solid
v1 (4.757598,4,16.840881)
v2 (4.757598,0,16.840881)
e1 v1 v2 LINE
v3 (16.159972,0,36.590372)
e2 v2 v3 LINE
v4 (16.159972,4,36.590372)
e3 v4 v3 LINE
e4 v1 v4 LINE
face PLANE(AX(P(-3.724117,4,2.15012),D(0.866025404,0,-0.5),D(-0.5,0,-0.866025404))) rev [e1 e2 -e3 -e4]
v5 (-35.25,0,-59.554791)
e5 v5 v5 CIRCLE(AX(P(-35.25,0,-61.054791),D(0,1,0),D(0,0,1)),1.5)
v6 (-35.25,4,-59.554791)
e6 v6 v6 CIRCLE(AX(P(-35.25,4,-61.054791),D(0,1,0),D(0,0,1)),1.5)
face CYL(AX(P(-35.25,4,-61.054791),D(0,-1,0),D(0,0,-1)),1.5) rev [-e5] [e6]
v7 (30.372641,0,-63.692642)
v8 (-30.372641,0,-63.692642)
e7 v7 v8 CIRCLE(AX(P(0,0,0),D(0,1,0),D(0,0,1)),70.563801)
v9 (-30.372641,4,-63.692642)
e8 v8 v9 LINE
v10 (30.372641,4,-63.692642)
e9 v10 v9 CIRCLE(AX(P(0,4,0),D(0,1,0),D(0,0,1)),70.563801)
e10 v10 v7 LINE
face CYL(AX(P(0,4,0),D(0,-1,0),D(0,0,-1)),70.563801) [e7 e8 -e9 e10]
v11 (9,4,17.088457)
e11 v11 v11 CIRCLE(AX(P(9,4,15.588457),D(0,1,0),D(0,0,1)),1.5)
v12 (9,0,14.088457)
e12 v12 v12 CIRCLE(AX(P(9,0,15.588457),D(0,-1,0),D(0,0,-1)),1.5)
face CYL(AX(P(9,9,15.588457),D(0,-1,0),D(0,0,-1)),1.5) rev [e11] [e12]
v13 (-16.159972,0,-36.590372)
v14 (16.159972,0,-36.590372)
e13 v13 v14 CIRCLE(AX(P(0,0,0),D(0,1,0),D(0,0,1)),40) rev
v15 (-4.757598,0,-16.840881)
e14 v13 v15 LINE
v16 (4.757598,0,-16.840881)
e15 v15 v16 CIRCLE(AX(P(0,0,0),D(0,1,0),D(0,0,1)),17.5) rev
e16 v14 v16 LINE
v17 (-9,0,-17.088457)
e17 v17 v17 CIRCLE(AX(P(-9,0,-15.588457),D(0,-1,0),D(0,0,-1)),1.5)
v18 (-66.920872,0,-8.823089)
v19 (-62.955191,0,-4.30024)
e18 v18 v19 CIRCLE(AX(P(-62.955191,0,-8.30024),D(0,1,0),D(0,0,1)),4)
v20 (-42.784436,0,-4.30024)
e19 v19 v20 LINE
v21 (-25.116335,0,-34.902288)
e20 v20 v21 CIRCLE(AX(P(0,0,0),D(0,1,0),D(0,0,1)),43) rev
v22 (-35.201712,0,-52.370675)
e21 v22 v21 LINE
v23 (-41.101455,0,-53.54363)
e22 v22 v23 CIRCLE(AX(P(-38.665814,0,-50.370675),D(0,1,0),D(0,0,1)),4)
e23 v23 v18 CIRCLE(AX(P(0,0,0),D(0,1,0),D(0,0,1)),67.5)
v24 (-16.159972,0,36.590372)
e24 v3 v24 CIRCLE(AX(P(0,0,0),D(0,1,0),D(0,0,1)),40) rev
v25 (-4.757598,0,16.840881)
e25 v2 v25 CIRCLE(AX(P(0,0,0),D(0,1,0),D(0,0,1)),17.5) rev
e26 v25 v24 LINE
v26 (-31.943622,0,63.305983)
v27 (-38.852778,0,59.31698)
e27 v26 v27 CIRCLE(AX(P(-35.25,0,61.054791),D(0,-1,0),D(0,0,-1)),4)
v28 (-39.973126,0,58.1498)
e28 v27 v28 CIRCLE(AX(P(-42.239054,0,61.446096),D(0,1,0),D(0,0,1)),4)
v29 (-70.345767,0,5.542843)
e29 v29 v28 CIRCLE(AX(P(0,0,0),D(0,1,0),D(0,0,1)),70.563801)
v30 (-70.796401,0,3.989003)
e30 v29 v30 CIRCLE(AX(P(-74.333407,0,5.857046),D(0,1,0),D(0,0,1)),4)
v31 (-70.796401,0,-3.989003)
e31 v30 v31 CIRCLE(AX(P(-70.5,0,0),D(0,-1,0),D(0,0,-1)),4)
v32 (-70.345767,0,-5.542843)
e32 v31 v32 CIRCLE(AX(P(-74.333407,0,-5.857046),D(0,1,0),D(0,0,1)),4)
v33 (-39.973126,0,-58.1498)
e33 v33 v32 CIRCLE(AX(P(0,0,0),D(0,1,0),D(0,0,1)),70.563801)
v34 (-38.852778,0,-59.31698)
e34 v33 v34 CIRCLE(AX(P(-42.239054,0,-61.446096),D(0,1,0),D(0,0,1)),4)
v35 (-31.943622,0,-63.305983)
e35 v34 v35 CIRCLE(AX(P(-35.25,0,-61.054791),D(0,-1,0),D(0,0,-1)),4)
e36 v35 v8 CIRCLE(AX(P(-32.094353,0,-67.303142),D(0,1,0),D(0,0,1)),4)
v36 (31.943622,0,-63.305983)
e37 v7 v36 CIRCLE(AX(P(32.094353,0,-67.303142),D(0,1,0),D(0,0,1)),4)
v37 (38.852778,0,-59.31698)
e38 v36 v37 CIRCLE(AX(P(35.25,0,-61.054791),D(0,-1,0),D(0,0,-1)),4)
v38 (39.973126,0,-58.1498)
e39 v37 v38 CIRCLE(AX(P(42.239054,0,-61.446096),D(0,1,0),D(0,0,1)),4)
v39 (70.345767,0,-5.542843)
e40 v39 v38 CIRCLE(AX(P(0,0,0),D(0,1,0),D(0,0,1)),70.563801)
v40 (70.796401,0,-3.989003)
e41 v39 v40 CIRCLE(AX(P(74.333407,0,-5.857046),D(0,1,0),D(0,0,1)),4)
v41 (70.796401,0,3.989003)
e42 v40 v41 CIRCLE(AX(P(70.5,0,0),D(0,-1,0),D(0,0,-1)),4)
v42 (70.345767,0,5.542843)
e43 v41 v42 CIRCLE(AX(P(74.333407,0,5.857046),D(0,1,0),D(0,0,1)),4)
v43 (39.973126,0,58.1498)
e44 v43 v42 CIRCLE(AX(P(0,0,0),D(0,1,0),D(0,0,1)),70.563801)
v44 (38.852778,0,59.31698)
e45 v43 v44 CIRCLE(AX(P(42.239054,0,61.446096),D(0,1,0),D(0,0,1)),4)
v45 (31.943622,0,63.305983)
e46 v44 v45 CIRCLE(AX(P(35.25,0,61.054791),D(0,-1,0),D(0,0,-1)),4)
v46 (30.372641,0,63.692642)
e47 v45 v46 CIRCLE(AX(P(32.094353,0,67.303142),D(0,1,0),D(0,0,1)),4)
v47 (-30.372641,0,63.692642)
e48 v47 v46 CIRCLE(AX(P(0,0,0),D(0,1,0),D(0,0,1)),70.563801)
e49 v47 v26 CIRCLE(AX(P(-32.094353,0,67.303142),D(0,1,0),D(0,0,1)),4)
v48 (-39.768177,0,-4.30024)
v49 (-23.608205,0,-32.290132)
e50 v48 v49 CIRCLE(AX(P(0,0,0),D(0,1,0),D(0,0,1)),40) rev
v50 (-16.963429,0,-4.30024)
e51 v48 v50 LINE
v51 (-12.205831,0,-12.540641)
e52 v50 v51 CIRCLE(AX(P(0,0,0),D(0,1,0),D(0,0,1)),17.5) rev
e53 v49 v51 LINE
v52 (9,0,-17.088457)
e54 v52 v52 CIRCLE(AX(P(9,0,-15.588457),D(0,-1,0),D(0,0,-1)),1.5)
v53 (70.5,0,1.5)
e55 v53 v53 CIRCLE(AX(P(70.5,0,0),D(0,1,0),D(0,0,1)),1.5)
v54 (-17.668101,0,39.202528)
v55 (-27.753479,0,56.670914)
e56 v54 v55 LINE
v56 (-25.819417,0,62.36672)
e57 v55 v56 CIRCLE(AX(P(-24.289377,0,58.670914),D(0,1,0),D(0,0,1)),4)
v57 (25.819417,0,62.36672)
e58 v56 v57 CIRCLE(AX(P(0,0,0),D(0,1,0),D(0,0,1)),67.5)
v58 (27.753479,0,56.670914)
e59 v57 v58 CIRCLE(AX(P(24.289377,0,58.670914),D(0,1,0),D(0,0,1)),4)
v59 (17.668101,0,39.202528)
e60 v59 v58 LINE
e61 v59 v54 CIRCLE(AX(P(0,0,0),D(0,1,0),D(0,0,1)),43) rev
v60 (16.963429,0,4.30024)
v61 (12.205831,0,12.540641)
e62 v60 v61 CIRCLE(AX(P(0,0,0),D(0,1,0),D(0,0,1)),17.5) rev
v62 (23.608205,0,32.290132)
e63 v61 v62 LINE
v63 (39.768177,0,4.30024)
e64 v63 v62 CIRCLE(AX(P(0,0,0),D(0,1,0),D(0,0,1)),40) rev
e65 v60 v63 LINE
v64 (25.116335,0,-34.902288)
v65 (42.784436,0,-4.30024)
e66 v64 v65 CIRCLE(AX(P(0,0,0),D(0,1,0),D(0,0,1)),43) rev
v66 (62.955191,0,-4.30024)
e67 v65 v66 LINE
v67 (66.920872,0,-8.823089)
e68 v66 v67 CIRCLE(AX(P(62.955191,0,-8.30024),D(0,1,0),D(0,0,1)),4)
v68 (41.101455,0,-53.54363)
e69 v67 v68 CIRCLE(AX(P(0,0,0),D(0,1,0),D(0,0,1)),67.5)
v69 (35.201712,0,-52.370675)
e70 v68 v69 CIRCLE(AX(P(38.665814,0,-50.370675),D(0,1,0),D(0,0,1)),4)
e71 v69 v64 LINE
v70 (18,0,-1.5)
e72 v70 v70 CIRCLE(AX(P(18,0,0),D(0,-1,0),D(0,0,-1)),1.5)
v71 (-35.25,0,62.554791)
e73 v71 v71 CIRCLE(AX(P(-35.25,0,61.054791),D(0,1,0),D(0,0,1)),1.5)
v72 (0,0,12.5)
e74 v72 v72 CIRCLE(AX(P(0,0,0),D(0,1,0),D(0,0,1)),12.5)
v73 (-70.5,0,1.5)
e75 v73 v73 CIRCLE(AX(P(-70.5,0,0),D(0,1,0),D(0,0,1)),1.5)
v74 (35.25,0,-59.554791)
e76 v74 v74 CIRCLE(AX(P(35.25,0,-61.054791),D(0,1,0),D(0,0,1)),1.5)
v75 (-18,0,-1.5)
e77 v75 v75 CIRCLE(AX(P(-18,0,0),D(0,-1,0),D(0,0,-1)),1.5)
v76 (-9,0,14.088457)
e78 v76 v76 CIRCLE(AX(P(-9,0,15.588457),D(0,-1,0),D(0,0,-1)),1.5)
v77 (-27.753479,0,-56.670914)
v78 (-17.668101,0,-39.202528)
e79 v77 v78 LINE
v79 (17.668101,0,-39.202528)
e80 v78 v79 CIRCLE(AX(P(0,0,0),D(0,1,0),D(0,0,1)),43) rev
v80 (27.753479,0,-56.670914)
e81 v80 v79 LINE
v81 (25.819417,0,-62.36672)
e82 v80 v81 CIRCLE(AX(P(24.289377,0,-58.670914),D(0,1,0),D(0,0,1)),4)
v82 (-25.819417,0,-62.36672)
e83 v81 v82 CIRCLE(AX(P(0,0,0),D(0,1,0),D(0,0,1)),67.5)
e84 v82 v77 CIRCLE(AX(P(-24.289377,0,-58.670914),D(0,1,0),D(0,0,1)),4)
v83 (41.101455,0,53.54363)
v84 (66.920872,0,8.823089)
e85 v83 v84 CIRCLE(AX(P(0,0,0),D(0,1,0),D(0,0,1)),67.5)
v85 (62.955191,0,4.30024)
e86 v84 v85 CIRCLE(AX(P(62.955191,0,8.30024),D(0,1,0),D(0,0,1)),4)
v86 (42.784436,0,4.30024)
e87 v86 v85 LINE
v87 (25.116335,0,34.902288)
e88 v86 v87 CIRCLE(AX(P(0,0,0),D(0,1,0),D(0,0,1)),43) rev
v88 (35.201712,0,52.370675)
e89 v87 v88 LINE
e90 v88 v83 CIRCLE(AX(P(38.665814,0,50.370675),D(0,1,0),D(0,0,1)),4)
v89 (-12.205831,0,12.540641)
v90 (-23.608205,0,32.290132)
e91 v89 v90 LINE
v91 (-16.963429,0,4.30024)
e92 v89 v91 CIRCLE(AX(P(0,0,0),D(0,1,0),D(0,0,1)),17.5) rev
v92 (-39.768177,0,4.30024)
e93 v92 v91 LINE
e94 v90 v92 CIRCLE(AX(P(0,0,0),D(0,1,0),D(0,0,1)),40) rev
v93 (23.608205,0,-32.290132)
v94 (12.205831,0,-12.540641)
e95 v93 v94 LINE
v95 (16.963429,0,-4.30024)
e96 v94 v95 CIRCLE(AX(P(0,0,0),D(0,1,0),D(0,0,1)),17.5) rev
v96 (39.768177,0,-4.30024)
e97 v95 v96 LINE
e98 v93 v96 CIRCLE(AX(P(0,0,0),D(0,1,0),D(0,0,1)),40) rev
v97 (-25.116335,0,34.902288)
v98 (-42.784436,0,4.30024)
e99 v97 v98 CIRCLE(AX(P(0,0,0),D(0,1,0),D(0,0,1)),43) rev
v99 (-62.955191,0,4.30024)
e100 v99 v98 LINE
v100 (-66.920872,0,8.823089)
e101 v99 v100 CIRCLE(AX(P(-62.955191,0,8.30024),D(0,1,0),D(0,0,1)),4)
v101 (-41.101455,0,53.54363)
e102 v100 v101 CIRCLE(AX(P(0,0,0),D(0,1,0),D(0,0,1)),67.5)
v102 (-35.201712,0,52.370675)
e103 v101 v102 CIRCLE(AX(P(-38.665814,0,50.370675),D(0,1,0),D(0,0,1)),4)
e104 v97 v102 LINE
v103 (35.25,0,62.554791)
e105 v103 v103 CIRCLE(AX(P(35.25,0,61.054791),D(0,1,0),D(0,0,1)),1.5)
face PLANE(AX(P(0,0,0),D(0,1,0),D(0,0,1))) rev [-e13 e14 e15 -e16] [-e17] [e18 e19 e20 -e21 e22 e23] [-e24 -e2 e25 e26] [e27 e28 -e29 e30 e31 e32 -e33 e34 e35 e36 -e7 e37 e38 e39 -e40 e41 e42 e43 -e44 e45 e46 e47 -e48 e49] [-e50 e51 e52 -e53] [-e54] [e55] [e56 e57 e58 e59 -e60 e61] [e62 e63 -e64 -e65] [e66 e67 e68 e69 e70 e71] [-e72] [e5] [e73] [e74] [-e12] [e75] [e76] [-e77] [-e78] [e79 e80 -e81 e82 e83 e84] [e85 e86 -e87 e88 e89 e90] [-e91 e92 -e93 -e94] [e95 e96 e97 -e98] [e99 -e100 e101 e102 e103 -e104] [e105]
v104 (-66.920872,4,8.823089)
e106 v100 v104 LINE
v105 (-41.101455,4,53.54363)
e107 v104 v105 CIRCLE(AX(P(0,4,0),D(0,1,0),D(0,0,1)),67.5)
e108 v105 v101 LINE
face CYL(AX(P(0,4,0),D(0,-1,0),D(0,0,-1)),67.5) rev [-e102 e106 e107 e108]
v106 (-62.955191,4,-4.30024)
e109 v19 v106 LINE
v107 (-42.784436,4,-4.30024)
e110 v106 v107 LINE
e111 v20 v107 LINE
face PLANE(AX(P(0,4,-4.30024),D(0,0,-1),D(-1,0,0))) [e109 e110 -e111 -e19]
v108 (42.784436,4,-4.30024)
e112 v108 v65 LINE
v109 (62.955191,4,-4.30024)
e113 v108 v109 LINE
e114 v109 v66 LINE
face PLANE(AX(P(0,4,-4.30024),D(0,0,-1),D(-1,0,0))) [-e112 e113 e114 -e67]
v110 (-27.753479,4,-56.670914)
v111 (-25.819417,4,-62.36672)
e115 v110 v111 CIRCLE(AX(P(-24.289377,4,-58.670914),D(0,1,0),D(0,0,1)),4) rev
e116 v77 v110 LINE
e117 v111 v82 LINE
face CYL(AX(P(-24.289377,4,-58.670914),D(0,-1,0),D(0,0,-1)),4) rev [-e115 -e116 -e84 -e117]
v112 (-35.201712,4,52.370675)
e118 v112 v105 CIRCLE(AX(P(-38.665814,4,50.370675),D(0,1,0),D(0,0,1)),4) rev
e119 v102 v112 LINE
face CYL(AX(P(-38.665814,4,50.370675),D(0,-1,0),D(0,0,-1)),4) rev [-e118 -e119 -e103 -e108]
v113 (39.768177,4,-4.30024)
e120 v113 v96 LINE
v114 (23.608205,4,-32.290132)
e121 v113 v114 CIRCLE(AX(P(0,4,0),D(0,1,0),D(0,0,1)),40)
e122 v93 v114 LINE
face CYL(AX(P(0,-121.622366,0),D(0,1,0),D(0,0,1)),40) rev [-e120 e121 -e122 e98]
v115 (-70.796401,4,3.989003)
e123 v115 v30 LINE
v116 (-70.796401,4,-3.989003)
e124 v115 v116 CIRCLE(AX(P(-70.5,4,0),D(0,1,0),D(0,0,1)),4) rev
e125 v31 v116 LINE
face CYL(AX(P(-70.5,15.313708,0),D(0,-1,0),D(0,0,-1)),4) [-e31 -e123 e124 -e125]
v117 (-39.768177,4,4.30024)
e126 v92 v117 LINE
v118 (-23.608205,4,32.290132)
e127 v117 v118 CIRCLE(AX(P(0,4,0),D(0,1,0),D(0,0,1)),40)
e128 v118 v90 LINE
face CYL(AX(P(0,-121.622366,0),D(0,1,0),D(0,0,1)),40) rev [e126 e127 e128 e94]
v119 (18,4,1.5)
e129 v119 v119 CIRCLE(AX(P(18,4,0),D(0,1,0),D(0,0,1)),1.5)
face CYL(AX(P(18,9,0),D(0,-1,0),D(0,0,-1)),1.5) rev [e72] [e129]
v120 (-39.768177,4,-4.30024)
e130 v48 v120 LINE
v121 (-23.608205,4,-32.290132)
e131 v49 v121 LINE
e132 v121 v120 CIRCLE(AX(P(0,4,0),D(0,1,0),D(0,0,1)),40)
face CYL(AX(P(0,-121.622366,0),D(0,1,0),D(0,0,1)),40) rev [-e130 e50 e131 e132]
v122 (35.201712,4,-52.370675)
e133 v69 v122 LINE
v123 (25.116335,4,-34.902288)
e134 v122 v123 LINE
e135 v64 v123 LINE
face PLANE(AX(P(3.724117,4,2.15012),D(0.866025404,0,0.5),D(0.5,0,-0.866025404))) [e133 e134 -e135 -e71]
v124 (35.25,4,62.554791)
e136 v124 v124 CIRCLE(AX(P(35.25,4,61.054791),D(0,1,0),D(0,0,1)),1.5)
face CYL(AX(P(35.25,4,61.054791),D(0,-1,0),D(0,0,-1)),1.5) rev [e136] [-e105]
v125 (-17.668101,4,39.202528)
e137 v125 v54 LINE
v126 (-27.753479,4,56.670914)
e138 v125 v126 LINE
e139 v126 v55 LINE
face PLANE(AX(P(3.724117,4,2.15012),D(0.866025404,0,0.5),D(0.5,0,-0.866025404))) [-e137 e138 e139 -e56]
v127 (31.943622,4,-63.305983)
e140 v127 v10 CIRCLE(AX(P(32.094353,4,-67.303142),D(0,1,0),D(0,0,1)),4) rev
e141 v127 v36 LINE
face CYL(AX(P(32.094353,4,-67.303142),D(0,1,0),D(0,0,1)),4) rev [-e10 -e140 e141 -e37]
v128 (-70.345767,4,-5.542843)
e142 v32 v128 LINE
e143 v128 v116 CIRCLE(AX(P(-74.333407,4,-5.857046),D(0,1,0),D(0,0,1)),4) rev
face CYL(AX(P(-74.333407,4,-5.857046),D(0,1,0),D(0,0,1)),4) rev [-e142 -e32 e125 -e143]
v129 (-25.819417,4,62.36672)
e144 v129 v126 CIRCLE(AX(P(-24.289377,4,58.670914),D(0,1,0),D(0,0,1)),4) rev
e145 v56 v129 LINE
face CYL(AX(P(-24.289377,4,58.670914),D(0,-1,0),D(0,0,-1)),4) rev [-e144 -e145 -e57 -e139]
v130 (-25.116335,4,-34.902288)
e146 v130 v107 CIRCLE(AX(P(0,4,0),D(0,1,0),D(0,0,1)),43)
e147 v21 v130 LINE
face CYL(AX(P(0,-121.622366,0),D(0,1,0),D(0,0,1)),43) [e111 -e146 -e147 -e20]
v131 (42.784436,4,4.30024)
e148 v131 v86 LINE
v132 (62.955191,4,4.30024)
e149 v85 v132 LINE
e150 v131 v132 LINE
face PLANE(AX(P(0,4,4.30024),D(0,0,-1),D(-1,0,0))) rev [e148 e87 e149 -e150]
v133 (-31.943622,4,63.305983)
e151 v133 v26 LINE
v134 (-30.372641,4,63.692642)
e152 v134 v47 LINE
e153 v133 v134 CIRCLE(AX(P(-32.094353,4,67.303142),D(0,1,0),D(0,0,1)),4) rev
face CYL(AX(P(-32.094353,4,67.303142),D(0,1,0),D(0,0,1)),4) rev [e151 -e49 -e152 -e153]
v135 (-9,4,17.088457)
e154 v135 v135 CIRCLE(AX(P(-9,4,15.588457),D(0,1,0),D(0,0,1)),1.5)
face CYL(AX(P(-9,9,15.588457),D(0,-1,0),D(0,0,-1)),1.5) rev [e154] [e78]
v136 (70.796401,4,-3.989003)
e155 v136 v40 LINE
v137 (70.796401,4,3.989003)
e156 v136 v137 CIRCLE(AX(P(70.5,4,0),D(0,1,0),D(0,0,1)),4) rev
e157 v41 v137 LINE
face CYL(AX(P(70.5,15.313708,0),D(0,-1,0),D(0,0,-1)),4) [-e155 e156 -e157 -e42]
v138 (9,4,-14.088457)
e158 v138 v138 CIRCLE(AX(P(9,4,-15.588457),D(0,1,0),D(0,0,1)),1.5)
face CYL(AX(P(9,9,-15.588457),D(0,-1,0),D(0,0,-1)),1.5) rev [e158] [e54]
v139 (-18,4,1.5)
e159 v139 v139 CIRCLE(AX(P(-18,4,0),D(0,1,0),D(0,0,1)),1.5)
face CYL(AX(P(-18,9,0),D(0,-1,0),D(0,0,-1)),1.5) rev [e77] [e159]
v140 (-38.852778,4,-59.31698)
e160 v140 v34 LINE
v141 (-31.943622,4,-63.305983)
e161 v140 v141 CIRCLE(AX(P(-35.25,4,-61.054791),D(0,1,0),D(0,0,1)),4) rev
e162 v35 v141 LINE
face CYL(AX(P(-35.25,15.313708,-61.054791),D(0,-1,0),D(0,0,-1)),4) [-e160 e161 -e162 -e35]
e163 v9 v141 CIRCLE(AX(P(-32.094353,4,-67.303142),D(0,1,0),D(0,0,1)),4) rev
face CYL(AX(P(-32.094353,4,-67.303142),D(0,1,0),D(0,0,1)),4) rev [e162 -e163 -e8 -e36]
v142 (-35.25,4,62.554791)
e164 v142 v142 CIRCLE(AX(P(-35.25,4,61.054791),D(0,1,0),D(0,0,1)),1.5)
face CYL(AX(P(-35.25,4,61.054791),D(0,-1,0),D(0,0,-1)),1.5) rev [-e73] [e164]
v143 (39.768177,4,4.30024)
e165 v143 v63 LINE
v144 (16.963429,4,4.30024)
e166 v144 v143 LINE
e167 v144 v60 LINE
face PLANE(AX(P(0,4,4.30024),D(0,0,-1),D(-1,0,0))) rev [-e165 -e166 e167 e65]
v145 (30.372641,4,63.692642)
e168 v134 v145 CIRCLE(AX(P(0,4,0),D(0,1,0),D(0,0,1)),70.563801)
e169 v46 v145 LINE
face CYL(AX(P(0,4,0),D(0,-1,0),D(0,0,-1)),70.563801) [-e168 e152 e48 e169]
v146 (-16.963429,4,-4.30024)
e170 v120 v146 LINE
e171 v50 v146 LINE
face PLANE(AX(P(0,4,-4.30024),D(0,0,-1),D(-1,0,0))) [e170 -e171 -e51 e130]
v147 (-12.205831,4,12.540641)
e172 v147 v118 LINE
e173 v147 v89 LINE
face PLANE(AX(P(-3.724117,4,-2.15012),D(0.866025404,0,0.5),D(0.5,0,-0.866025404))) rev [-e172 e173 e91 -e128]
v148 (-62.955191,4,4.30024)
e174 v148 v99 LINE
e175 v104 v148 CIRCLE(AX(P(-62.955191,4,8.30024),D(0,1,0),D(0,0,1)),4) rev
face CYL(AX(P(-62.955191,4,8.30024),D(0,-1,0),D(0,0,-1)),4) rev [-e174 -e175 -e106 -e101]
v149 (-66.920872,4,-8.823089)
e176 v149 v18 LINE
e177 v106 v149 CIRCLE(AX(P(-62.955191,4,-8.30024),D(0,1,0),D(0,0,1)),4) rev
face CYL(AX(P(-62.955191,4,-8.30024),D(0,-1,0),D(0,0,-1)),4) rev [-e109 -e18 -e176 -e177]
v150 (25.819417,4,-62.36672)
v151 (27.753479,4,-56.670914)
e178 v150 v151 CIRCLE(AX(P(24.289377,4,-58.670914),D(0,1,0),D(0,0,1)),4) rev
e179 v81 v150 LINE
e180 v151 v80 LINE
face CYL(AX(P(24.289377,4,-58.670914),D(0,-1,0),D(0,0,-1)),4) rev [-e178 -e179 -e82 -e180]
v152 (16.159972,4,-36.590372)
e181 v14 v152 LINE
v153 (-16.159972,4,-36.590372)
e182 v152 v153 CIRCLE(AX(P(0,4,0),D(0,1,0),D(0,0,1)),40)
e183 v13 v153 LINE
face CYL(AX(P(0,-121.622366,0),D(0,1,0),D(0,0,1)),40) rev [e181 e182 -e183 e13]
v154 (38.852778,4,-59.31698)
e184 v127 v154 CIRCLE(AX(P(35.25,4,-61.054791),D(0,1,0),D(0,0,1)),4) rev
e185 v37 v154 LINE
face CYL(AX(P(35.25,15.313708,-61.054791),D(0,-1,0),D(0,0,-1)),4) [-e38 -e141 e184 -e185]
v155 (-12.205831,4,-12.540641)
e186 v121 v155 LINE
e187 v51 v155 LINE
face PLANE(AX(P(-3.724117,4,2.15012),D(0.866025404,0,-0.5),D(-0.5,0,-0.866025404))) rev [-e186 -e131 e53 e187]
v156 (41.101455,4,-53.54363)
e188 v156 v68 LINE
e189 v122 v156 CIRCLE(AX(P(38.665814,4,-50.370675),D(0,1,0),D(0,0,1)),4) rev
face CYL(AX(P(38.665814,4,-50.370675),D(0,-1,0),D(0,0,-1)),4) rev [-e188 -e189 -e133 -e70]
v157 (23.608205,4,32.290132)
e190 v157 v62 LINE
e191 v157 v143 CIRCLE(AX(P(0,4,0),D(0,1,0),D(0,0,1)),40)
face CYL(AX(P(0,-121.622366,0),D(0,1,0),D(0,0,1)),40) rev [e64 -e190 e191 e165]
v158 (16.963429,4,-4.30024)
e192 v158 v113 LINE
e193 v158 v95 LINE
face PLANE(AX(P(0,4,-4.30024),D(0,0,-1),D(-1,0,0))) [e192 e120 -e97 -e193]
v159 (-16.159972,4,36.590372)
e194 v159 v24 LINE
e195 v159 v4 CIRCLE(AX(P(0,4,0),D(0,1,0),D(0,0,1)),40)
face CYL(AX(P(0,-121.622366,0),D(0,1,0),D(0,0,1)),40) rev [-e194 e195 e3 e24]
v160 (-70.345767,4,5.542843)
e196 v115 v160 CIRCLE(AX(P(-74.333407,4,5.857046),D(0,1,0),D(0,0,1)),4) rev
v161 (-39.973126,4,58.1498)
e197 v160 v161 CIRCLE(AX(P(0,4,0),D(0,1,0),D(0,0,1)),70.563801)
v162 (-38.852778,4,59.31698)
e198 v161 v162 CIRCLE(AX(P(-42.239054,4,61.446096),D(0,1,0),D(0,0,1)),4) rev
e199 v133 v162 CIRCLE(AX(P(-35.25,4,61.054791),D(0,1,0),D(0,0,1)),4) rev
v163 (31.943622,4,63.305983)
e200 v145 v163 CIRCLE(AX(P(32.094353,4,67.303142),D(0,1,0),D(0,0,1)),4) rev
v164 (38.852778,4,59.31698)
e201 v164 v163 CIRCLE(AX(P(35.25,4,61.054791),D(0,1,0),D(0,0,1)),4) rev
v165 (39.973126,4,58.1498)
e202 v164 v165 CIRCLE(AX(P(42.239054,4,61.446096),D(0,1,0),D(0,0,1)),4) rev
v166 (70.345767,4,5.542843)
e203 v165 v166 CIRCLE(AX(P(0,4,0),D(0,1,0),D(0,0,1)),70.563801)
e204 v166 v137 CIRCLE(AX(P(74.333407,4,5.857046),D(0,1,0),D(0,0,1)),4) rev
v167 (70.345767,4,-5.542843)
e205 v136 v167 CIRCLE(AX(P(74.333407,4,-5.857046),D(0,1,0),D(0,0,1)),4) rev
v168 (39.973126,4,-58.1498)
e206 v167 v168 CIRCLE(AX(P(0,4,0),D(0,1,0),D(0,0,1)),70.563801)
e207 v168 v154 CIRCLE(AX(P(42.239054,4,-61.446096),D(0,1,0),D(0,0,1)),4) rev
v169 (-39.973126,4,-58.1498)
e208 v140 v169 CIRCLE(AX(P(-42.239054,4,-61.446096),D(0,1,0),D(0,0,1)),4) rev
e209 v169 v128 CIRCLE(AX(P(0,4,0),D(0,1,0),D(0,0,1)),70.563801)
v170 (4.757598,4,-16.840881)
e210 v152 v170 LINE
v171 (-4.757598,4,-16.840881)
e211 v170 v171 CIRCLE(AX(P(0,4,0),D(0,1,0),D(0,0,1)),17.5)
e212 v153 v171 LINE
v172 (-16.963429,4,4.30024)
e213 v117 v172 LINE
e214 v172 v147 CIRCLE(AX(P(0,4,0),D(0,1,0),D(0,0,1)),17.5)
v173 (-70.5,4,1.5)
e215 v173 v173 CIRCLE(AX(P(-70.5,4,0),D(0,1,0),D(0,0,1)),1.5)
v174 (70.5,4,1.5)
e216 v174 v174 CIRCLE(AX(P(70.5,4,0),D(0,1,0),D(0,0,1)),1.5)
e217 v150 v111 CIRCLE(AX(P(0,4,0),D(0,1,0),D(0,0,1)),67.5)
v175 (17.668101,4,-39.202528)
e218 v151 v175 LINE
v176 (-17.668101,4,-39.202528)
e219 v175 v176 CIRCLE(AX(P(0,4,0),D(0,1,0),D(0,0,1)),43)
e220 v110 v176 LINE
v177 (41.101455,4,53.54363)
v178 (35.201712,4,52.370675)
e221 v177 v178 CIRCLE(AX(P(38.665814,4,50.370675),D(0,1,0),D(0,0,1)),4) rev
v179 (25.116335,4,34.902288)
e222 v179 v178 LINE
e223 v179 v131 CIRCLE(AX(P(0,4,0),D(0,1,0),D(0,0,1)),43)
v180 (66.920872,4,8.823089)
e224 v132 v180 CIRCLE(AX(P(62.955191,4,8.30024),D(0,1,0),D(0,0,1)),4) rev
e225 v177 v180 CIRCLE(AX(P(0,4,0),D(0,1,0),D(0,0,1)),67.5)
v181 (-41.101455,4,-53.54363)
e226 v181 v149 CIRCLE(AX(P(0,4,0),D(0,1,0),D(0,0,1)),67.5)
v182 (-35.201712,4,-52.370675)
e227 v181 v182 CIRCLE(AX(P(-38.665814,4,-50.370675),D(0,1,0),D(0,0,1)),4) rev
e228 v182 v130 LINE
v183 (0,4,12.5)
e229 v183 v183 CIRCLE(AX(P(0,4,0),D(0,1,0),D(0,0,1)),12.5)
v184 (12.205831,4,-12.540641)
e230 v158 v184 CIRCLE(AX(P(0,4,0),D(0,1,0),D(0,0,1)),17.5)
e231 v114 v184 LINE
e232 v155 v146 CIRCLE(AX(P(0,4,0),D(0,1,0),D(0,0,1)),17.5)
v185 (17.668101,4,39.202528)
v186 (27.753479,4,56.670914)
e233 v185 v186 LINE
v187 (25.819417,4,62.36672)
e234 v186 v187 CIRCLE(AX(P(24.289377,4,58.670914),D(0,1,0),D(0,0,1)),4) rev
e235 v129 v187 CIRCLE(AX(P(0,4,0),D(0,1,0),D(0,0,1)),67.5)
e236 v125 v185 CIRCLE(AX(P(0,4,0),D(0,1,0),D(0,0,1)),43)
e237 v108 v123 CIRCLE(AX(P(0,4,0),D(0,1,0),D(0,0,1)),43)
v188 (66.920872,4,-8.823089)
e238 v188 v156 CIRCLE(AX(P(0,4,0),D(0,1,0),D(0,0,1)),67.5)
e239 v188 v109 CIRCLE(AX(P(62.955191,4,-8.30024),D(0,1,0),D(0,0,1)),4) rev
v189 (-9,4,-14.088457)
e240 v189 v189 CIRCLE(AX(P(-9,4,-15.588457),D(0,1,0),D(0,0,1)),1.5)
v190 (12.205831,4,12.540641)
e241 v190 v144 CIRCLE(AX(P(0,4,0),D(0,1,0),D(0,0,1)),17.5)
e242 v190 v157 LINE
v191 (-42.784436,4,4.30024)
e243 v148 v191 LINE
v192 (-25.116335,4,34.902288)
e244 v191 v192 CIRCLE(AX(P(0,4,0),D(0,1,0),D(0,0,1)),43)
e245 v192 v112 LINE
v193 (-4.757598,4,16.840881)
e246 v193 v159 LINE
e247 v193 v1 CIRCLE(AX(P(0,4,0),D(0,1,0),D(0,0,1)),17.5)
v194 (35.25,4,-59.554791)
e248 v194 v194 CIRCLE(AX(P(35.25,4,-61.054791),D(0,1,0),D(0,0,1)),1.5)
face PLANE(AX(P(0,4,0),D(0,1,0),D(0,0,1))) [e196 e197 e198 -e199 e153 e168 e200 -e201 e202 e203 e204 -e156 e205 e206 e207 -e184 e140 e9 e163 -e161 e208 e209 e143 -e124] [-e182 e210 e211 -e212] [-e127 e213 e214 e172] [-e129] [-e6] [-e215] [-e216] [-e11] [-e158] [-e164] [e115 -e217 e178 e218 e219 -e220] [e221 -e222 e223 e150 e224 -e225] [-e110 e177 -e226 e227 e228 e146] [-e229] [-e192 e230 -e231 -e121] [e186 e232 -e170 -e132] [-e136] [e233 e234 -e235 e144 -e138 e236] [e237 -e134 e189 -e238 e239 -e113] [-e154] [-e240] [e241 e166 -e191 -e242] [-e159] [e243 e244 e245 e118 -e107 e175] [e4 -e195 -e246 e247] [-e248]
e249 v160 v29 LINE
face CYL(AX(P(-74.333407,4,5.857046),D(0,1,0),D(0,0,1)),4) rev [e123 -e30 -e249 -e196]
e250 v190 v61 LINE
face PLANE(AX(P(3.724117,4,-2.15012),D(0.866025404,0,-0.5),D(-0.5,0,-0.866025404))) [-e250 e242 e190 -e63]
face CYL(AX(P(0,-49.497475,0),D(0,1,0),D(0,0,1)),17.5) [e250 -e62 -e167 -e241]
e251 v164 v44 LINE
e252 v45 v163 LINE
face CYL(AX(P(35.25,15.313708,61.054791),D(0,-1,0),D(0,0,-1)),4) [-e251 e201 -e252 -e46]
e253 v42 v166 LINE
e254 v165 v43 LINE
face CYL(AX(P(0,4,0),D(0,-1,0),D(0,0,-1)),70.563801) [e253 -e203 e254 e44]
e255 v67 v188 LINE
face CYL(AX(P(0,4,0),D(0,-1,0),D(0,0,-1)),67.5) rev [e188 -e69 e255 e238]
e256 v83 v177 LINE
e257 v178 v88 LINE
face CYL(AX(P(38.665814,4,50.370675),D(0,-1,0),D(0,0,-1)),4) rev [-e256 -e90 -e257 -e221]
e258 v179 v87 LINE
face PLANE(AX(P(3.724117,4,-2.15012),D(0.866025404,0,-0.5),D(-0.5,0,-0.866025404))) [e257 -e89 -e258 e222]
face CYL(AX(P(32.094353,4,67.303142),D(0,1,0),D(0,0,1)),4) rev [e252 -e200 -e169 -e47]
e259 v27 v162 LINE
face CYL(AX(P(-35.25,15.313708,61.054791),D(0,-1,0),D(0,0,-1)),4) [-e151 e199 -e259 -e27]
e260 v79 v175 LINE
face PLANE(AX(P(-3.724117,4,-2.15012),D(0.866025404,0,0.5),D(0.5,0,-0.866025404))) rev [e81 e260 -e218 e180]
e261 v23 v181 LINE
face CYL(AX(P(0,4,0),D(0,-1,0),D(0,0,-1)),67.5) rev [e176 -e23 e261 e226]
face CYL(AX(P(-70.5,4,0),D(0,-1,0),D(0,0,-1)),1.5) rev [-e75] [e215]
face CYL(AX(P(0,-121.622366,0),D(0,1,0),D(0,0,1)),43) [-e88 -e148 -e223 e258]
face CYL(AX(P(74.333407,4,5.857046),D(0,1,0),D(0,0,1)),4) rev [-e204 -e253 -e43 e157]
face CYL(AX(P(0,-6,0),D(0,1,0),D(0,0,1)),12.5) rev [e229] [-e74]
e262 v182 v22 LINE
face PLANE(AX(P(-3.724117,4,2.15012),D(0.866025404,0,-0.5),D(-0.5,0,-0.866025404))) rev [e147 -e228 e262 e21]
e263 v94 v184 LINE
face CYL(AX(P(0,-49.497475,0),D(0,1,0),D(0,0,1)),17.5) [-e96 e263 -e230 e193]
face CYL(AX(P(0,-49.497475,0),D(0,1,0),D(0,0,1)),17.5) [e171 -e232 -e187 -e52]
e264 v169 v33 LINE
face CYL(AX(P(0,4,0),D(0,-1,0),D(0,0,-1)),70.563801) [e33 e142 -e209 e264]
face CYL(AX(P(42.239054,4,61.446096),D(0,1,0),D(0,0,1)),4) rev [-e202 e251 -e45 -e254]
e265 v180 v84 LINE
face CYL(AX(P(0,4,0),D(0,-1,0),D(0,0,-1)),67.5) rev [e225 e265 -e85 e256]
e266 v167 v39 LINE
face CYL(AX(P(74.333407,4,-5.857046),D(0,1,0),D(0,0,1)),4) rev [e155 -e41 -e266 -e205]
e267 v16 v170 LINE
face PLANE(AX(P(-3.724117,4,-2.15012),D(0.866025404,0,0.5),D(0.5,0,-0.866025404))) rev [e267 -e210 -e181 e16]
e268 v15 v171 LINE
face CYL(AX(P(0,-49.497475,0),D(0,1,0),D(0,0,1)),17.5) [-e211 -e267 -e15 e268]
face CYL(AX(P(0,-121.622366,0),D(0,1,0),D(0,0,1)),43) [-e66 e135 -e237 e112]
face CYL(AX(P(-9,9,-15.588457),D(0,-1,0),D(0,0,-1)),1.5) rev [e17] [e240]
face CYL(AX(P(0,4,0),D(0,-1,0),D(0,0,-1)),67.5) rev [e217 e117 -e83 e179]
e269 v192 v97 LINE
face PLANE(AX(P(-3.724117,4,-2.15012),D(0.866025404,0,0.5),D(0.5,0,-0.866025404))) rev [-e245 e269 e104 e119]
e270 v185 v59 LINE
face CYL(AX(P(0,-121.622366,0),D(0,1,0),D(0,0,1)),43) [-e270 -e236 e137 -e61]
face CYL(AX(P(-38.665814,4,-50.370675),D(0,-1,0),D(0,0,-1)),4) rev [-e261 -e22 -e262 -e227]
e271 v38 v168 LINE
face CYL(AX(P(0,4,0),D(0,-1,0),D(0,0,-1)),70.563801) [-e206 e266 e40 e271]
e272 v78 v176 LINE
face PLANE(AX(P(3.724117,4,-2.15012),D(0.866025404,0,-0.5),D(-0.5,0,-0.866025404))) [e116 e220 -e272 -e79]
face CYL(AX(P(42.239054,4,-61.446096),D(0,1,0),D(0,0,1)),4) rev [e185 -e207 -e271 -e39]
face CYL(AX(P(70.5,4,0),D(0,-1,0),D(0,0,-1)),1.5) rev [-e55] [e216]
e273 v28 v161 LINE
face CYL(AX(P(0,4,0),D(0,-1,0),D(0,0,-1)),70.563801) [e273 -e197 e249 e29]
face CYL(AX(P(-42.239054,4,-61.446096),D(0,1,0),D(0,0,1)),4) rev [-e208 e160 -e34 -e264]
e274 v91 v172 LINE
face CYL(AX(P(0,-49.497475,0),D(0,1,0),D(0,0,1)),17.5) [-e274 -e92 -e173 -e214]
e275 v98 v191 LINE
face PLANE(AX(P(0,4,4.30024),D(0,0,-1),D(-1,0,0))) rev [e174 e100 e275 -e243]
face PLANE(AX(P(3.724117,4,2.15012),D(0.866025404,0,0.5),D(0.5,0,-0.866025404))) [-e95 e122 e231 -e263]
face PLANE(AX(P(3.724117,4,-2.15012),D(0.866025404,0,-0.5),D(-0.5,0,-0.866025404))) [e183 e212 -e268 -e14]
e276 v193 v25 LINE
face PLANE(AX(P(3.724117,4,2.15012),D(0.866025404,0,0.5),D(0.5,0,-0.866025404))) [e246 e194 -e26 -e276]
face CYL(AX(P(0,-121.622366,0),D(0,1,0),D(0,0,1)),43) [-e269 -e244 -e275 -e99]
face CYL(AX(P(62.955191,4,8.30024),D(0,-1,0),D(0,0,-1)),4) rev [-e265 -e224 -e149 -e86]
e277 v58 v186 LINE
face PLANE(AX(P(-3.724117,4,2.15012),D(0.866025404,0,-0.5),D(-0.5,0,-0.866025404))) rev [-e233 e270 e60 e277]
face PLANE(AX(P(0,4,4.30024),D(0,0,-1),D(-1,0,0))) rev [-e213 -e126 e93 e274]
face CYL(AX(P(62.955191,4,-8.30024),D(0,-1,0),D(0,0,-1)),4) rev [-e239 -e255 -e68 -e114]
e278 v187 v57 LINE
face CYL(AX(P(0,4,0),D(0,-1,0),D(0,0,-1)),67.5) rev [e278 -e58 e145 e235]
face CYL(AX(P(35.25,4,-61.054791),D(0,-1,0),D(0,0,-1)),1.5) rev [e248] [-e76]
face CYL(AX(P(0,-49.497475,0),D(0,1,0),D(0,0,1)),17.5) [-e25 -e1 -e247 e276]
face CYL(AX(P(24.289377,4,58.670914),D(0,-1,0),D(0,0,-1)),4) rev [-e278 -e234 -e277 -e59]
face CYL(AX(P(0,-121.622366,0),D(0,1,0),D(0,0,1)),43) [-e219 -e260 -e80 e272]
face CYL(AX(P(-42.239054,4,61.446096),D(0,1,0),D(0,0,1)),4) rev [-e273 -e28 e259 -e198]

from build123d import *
from build123d.topology import SkipClean

# Parameters (mm, degrees)
SKETCH_1_R           = 1.4999999999999996
SKETCH_1_R_2         = 1.4999999999999998
SKETCH_1_R_3         = 1.5
SKETCH_1_R_4         = 1.4999999999999993
SKETCH_1_R_5         = 1.4999999999999971
SKETCH_1_R_6         = 1.5000000000000007
SKETCH_1_R_7         = 1.4999999999999944
SKETCH_1_R_8         = 1.4999999999999918
SKETCH_1_R_9         = 1.4999999999999887
SKETCH_1_R_10        = 4.5
EXTRUDE_1_DEPTH      = 4
FILLET_1_R           = 4
FILLET_2_R           = 4
EXTRUDE_2_DEPTH      = 5
EXTRUDE_2_DEPTH_BACK = 9
CHAMFER_1_SIZE       = 0.5
SKETCH_3_R           = 43
SKETCH_3_R_2         = 40
EXTRUDE_3_DEPTH      = 4
SKETCH_4_R           = 12.5
CUT_EXTRUDE_1_DEPTH  = 10
SKETCH_5_R           = 17.500000000000004
SKETCH_5_R_2         = 12.5
EXTRUDE_4_DEPTH      = 4
SKETCH_6_R           = 1.4999999999999987
SKETCH_6_R_2         = 1.4999999999997233
SKETCH_6_R_3         = 1.500000000000449
SKETCH_6_R_4         = 1.500000000001465
SKETCH_6_R_5         = 1.5000000000018021
SKETCH_6_R_6         = 1.5000000000011438
CUT_EXTRUDE_2_DEPTH  = 9.000000000000002
SKETCH_7_R           = 99.6246168555559
CUT_EXTRUDE_3_DEPTH  = 33
SKETCH_8_R           = 104.70068375535166
CUT_EXTRUDE_4_DEPTH  = 205.00000000000003
SKETCH_9_R           = 4.000000000000007
SKETCH_9_R_2         = 1.4999999999999973
SKETCH_9_R_3         = 3.999999999998955
SKETCH_9_R_4         = 1.4999999999989577
SKETCH_9_R_5         = 4.000000000001806
SKETCH_9_R_6         = 1.500000000001791
SKETCH_9_R_7         = 4.0000000000058265
SKETCH_9_R_8         = 1.500000000005815
SKETCH_9_R_9         = 4.000000000007099
SKETCH_9_R_10        = 1.5000000000070977
SKETCH_9_R_11        = 4.000000000004524
SKETCH_9_R_12        = 1.5000000000045177
EXTRUDE_5_DEPTH      = 4


with BuildPart() as part:
    # 草图1 → 凸台-拉伸1 (new body)
    with BuildSketch(Plane(origin=(0, 0, 0), x_dir=(1, 0, 0), z_dir=(0, 1, 0))):
        with BuildLine():
            ThreePointArc((-70.5, 3.000000000000008), (-73.50000000000001, 3.7e-16), (-70.5, -3.000000000000008))
            ThreePointArc((-70.5, -3.000000000000008), (-61.11004418260574, -35.281900459016875), (-37.84807621135403, -59.55479096680248))
            ThreePointArc((-37.84807621135403, -59.55479096680248), (-36.75000000000076, -63.65286717815582), (-32.65192378864741, -62.55479096680256))
            ThreePointArc((-32.65192378864741, -62.55479096680256), (-7.3209e-13, -70.56380091803446), (32.65192378864611, -62.55479096680326))
            ThreePointArc((32.65192378864611, -62.55479096680326), (36.74999999999942, -63.65286717815661), (37.848076211352776, -59.5547909668033))
            ThreePointArc((37.848076211352776, -59.5547909668033), (61.110044182605264, -35.281900459017756), (70.49999999999999, -3.0000000000005))
            ThreePointArc((70.49999999999999, -3.0000000000005), (73.50000000000001, -5.1362e-13), (70.50000000000003, 2.9999999999995155))
            ThreePointArc((70.50000000000003, 2.9999999999995155), (61.11004418260573, 35.28190045901688), (37.84807621135361, 59.55479096680278))
            ThreePointArc((37.84807621135361, 59.55479096680278), (36.75000000000032, 63.65286717815611), (32.65192378864698, 62.55479096680282))
            ThreePointArc((32.65192378864698, 62.55479096680282), (2.3935e-13, 70.5638009180345), (-32.65192378864655, 62.55479096680301))
            ThreePointArc((-32.65192378864655, 62.55479096680301), (-36.74999999999988, 63.65286717815634), (-37.84807621135321, 59.55479096680301))
            ThreePointArc((-37.84807621135321, 59.55479096680301), (-61.110044182605506, 35.281900459017315), (-70.5, 3.000000000000008))
        make_face()
        with Locations(Location((-8, 0, 0), (0, 0, 270))):
            Circle(SKETCH_1_R, mode=Mode.SUBTRACT)
        with Locations(Location((2.793e-14, 8, 0), (0, 0, 270))):
            Circle(SKETCH_1_R_2, mode=Mode.SUBTRACT)
        with Locations(Location((8, -5.586e-14, 0), (0, 0, 270))):
            Circle(SKETCH_1_R_3, mode=Mode.SUBTRACT)
        with Locations(Location((-8.38e-14, -7.999999999999998, 0), (0, 0, 270))):
            Circle(SKETCH_1_R_4, mode=Mode.SUBTRACT)
        with Locations(Location((-70.5, 0, 0), (0, 0, 270))):
            Circle(SKETCH_1_R_5, mode=Mode.SUBTRACT)
        with Locations(Location((-35.24999999999988, 61.05479096680301, 0), (0, 0, 270))):
            Circle(SKETCH_1_R_5, mode=Mode.SUBTRACT)
        with Locations(Location((35.2500000000003, 61.0547909668028, 0), (0, 0, 270))):
            Circle(SKETCH_1_R_6, mode=Mode.SUBTRACT)
        with Locations(Location((70.5, -4.923e-13, 0), (0, 0, 270))):
            Circle(SKETCH_1_R_7, mode=Mode.SUBTRACT)
        with Locations(Location((35.24999999999944, -61.05479096680328, 0), (0, 0, 270))):
            Circle(SKETCH_1_R_8, mode=Mode.SUBTRACT)
        with Locations(Location((-35.25000000000072, -61.054790966802514, 0), (0, 0, 270))):
            Circle(SKETCH_1_R_9, mode=Mode.SUBTRACT)
        with Locations(Location((0, 0, 0), (0, 0, 270))):
            Circle(SKETCH_1_R_10, mode=Mode.SUBTRACT)
        with BuildLine():
            Line((-9.579036496304667, 4.3002395052442415), (-67.36288251105003, 4.300239505244943))
            ThreePointArc((-67.36288251105003, 4.300239505244943), (-58.45671475544931, 33.75000000000055), (-37.405557909423486, 56.187847774094074))
            Line((-37.405557909423486, 56.187847774094074), (-8.513634902051102, 6.145569196956236))
            ThreePointArc((-8.513634902051102, 6.145569196956236), (-9.093266739736535, 5.250000000000124), (-9.579036496304667, 4.3002395052442415))
        make_face(mode=Mode.SUBTRACT)
        with BuildLine():
            Line((-9.579036496304774, -4.300239505243998), (-67.36288251105012, -4.300239505243795))
            ThreePointArc((-67.36288251105012, -4.300239505243795), (-58.45671475544982, -33.749999999999666), (-37.405557909424274, -56.18784777409356))
            Line((-37.405557909424274, -56.18784777409356), (-8.513634902051185, -6.145569196956118))
            ThreePointArc((-8.513634902051185, -6.145569196956118), (-9.093266739736634, -5.249999999999946), (-9.579036496304774, -4.300239505243998))
        make_face(mode=Mode.SUBTRACT)
        with BuildLine():
            Line((67.36288251105009, -4.300239505244269), (9.579036496304743, -4.3002395052440665))
            ThreePointArc((9.579036496304743, -4.3002395052440665), (9.093266739736448, -5.250000000000277), (8.513634902050788, -6.145569196956676))
            Line((8.513634902050788, -6.145569196956676), (37.405557909423074, -56.18784777409434))
            ThreePointArc((37.405557909423074, -56.18784777409434), (58.45671475544934, -33.7500000000005), (67.36288251105009, -4.300239505244269))
        make_face(mode=Mode.SUBTRACT)
        with BuildLine():
            Line((67.36288251105015, 4.300239505243303), (9.579036496304996, 4.300239505243507))
            ThreePointArc((9.579036496304996, 4.300239505243507), (9.093266739736636, 5.249999999999946), (8.513634902050875, 6.145569196956556))
            Line((8.513634902050875, 6.145569196956556), (37.40555790942386, 56.187847774093825))
            ThreePointArc((37.40555790942386, 56.187847774093825), (58.45671475544981, 33.74999999999966), (67.36288251105015, 4.300239505243303))
        make_face(mode=Mode.SUBTRACT)
        with BuildLine():
            Line((-1.065401594254097, 10.44580870220017), (-29.957324601626386, 60.48808727933784))
            ThreePointArc((-29.957324601626386, 60.48808727933784), (2.1397e-13, 67.50000000000003), (29.957324601626794, 60.48808727933765))
            Line((29.957324601626794, 60.48808727933765), (1.065401594253708, 10.445808702200214))
            ThreePointArc((1.065401594253708, 10.445808702200214), (-1.952e-13, 10.500000000000004), (-1.065401594254097, 10.44580870220017))
        make_face(mode=Mode.SUBTRACT)
        with BuildLine():
            Line((29.957324601625945, -60.48808727933805), (1.0654015942535602, -10.445808702200226))
            ThreePointArc((1.0654015942535602, -10.445808702200226), (-3.4441e-13, -10.500000000000004), (-1.0654015942542432, -10.44580870220016))
            Line((-1.0654015942542432, -10.44580870220016), (-29.957324601627235, -60.48808727933743))
            ThreePointArc((-29.957324601627235, -60.48808727933743), (-7.1529e-13, -67.50000000000001), (29.957324601625945, -60.48808727933805))
        make_face(mode=Mode.SUBTRACT)
    extrude(amount=EXTRUDE_1_DEPTH)

    # 圆角1
    fillet_1_edges = [part.edges().sort_by_distance(p)[0] for p in [
        (-32.651923788646556, 2, -62.554790966803),
        (32.65192378864698, 2, -62.55479096680281),
        (37.848076211353614, 2, -59.55479096680278),
        (70.50000000000003, 2, -2.9999999999995124),
        (70.49999999999997, 2, 3.000000000000502),
        (37.848076211352776, 2, 59.554790966803296),
        (32.651923788646116, 2, 62.55479096680326),
        (-32.65192378864741, 2, 62.55479096680256),
        (-37.84807621135403, 2, 59.55479096680247),
        (-70.5, 2, 3.0000000000000093),
        (-70.50000000000001, 2, -3.000000000000006),
        (-37.84807621135322, 2, -59.55479096680301),
        (29.957324601625942, 2, 60.488087279338046),
        (-29.957324601627235, 2, 60.488087279337435),
        (67.36288251105009, 2, 4.30023950524427),
        (37.40555790942307, 2, 56.18784777409434),
        (37.40555790942386, 2, -56.187847774093825),
        (67.36288251105015, 2, -4.300239505243307),
        (-29.957324601626386, 2, -60.48808727933785),
        (29.957324601626794, 2, -60.488087279337655),
        (-67.36288251105003, 2, -4.300239505244943),
        (-37.40555790942349, 2, -56.18784777409407),
        (-67.36288251105012, 2, 4.300239505243796),
        (-37.405557909424274, 2, 56.18784777409357),
    ]]
    fillet(fillet_1_edges, radius=FILLET_1_R)

    # 圆角2
    # the kernel refuses this fillet: 4 mm, written as the material it adds along each edge
    with BuildSketch(Plane(origin=(-1.0654015942542432, 0, 10.44580870220016), x_dir=(-0.5000000000000071, 0, 0.8660254037844346), z_dir=(0, 1, 0))) as fillet_2_piece_1:
        with BuildLine():
            CenterArc((2.3102874607430097, 4.000000000000001), FILLET_2_R, 214.9198731811867, 55.08012681881331)
            ThreePointArc((-0.9695260446492189, 1.710278757174414), (-0.44464689566161064, 0.8778804840632212), (0, 0))
            Line((0, 0), (2.31028746074301, 1e-17))
        make_face()
    extrude(amount=4)
    with BuildSketch(Plane(origin=(-8.513634902051187, 0, 6.145569196956119), x_dir=(-0.5068146140540679, 0, -0.8620550718957729), z_dir=(0, 1, 0))) as fillet_2_piece_2:
        with BuildLine():
            CenterArc((2.3404393067669487, 3.9824329250590425), FILLET_2_R, 209.5481152574792, 55.08012681882752)
            Line((-1.1393281601452958, 2.0098157862763673), (0, 0))
            ThreePointArc((0, 0), (0.9829845088421205, 0.04611357172001613), (1.9659690176842453, -4e-17))
        make_face()
    extrude(amount=4)
    with BuildSketch(Plane(origin=(-9.579036496304774, 0, 4.300239505243998), x_dir=(-1, 0, -3.46e-15), z_dir=(0, 1, 0))) as fillet_2_piece_3:
        with BuildLine():
            CenterArc((2.310287460742878, 4), FILLET_2_R, 214.91987318118893, 55.08012681881104)
            ThreePointArc((-0.9695260446492592, 1.7102787571742841), (-0.44464689566163024, 0.877880484063158), (0, 0))
            Line((0, 0), (2.3102874607428774, 0))
        make_face()
    extrude(amount=4)
    with BuildSketch(Plane(origin=(-9.579036496304667, 0, -4.300239505244241), x_dir=(0.49315428469593503, 0, -0.86994186672791), z_dir=(0, 1, 0))) as fillet_2_piece_4:
        with BuildLine():
            CenterArc((2.340439306766931, 3.982432925059041), FILLET_2_R, 209.54811525747962, 55.08012681882701)
            Line((-1.1393281601452994, 2.0098157862763424), (0, 0))
            ThreePointArc((0, 0), (0.9829845088421114, 0.04611357172001763), (1.9659690176842226, 1e-16))
        make_face()
    extrude(amount=4)
    with BuildSketch(Plane(origin=(-8.513634902051102, 0, -6.145569196956236), x_dir=(-0.4999999999999958, 0, -0.866025403784441), z_dir=(0, 1, 0))) as fillet_2_piece_5:
        with BuildLine():
            CenterArc((2.310287460742879, 3.9999999999999996), FILLET_2_R, 214.91987318118888, 55.080126818811095)
            ThreePointArc((-0.9695260446492604, 1.7102787571742883), (-0.4446468956616306, 0.8778804840631608), (0, 0))
            Line((0, 0), (2.3102874607428756, 0))
        make_face()
    extrude(amount=4)
    with BuildSketch(Plane(origin=(1.0654015942537083, 0, -10.445808702200214), x_dir=(0.5000000000000073, 0, -0.8660254037844344), z_dir=(0, 1, 0))) as fillet_2_piece_6:
        with BuildLine():
            CenterArc((2.3102874607428614, 4), FILLET_2_R, 214.91987318118936, 55.08012681881064)
            ThreePointArc((-0.9695260446492604, 1.710278757174261), (-0.4446468956616301, 0.8778804840631479), (0, 0))
            Line((0, 0), (2.3102874607428623, 1e-17))
        make_face()
    extrude(amount=4)
    with BuildSketch(Plane(origin=(-1.065401594254097, 0, -10.445808702200168), x_dir=(0.9999688987499935, 0, -0.007886794832196306), z_dir=(0, 1, 0))) as fillet_2_piece_7:
        with BuildLine():
            CenterArc((2.34043930676708, 3.9824329250590376), FILLET_2_R, 209.5481152574761, 55.08012681882997)
            Line((-1.13932816014527, 2.0098157862765516), (0, 0))
            ThreePointArc((0, 0), (0.9829845088421648, 0.04611357172002539), (1.96596901768433, 0))
        make_face()
    extrude(amount=4)
    with BuildSketch(Plane(origin=(9.579036496304996, 0, -4.300239505243507), x_dir=(1, 0, 3.08e-15), z_dir=(0, 1, 0))) as fillet_2_piece_8:
        with BuildLine():
            CenterArc((2.3102874607430053, 4), FILLET_2_R, 214.9198731811863, 55.08012681881371)
            ThreePointArc((-0.9695260446492372, 1.7102787571744347), (-0.44464689566161925, 0.8778804840632319), (0, 0))
            Line((0, 0), (2.3102874607430035, 0))
        make_face()
    extrude(amount=4)
    with BuildSketch(Plane(origin=(8.513634902050875, 0, -6.145569196956556), x_dir=(0.5068146140541091, 0, 0.8620550718957487), z_dir=(0, 1, 0))) as fillet_2_piece_9:
        with BuildLine():
            CenterArc((2.340439306767016, 3.982432925059042), FILLET_2_R, 209.54811525747644, 55.08012681883031)
            Line((-1.1393281601453242, 2.009815786276536), (0, 0))
            ThreePointArc((0, 0), (0.9829845088421585, 0.04611357172001612), (1.965969017684317, 1e-17))
        make_face()
    extrude(amount=4)
    with BuildSketch(Plane(origin=(9.579036496304745, 0, 4.3002395052440665), x_dir=(-0.49315428469592015, 0, 0.8699418667279183), z_dir=(0, 1, 0))) as fillet_2_piece_10:
        with BuildLine():
            CenterArc((2.3404393067669487, 3.9824329250590416), FILLET_2_R, 209.54811525747917, 55.08012681882752)
            Line((-1.1393281601452967, 2.0098157862763704), (0, 0))
            ThreePointArc((0, 0), (0.9829845088421224, 0.04611357172001689), (1.9659690176842455, -5e-17))
        make_face()
    extrude(amount=4)
    with BuildSketch(Plane(origin=(8.51363490205079, 0, 6.145569196956677), x_dir=(0.4999999999999941, 0, 0.866025403784442), z_dir=(0, 1, 0))) as fillet_2_piece_11:
        with BuildLine():
            CenterArc((2.310287460742971, 4), FILLET_2_R, 214.9198731811868, 55.080126818813255)
            ThreePointArc((-0.969526044649251, 1.7102787571744063), (-0.44464689566161575, 0.8778804840632242), (0, 0))
            Line((0, 0), (2.3102874607429755, 0))
        make_face()
    extrude(amount=4)
    with BuildSketch(Plane(origin=(1.0654015942535602, 0, 10.445808702200228), x_dir=(0.4999999999999959, 0, 0.8660254037844409), z_dir=(0, 1, 0))) as fillet_2_piece_12:
        with BuildLine():
            CenterArc((2.3102874607428734, -4), FILLET_2_R, 89.99999999999994, 55.08012681881101)
            ThreePointArc((-0.9695260446492603, -1.7102787571742772), (-0.4446468956616315, -0.8778804840631549), (0, 0))
            Line((0, 0), (2.3102874607428774, -2.2e-16))
        make_face()
    extrude(amount=4)

    # 草图2 → 凸台-拉伸2 (add, two sides: drawn at the far end of the back side and taken through both)
    with SkipClean():  # the faces are left unmerged after this step: merging them gives an invalid solid
        with BuildSketch(Plane(origin=(0, 0, 0), x_dir=(-1, 0, 0), z_dir=(0, -1, 0)).offset(-EXTRUDE_2_DEPTH_BACK)):
            with BuildLine():
                Line((23.0863596744827, -63.429251903048794), (23.5993898894712, -64.83879083422764))
                ThreePointArc((23.5993898894712, -64.83879083422764), (4.23e-15, -68.99999999999999), (-23.5993898894712, -64.83879083422764))
                Line((-23.5993898894712, -64.83879083422764), (-23.0863596744827, -63.429251903048794))
                ThreePointArc((-23.0863596744827, -63.429251903048794), (4.13e-15, -67.5), (23.0863596744827, -63.429251903048794))
            make_face()
            with BuildLine():
                Line((-43.38816365384148, -51.70799991053096), (-44.352345068371285, -52.85706657520941))
                ThreePointArc((-44.352345068371285, -52.85706657520941), (-59.75575286112633, -34.49999999999986), (-67.95173495784238, -11.981724259017966))
                Line((-67.95173495784238, -11.981724259017966), (-66.4745233283241, -11.721251992517583))
                ThreePointArc((-66.4745233283241, -11.721251992517583), (-58.4567147554497, -33.74999999999988), (-43.38816365384148, -51.70799991053096))
            make_face()
            with BuildLine():
                Line((-66.47452332832401, 11.721251992518056), (-67.9517349578423, 11.981724259018446))
                ThreePointArc((-67.9517349578423, 11.981724259018446), (-59.755752861126105, 34.50000000000029), (-44.352345068370916, 52.857066575209736))
                Line((-44.352345068370916, 52.857066575209736), (-43.388163653841126, 51.70799991053128))
                ThreePointArc((-43.388163653841126, 51.70799991053128), (-58.45671475544946, 33.75000000000029), (-66.47452332832401, 11.721251992518056))
            make_face()
            with BuildLine():
                Line((-23.086359674482257, 63.429251903048964), (-23.599389889470746, 64.83879083422781))
                ThreePointArc((-23.599389889470746, 64.83879083422781), (4.945e-13, 68.99999999999997), (23.599389889471656, 64.83879083422747))
                Line((23.599389889471656, 64.83879083422747), (23.086359674483145, 63.42925190304863))
                ThreePointArc((23.086359674483145, 63.42925190304863), (4.6876e-13, 67.5), (-23.086359674482257, 63.429251903048964))
            make_face()
            with BuildLine():
                Line((43.388163653841836, 51.70799991053065), (44.35234506837164, 52.8570665752091))
                ThreePointArc((44.35234506837164, 52.8570665752091), (59.755752861126574, 34.49999999999944), (67.95173495784246, 11.981724259017493))
                Line((67.95173495784246, 11.981724259017493), (66.47452332832417, 11.721251992517116))
                ThreePointArc((66.47452332832417, 11.721251992517116), (58.45671475544992, 33.74999999999946), (43.388163653841836, 51.70799991053065))
            make_face()
            with BuildLine():
                Line((66.47452332832391, -11.721251992518493), (67.9517349578422, -11.981724259018899))
                ThreePointArc((67.9517349578422, -11.981724259018899), (59.75575286112585, -34.500000000000675), (44.35234506837053, -52.85706657521001))
                Line((44.35234506837053, -52.85706657521001), (43.388163653840756, -51.70799991053155))
                ThreePointArc((43.388163653840756, -51.70799991053155), (58.45671475544921, -33.75000000000066), (66.47452332832391, -11.721251992518493))
            make_face()
        extrude(amount=EXTRUDE_2_DEPTH + EXTRUDE_2_DEPTH_BACK)

    # 倒角1
    chamfer_1_edges = [part.edges().sort_by_distance(p)[0] for p in [
        (7.11e-15, -5, 68.99999999999997),
        (59.75575286112634, -5, 34.49999999999986),
        (59.755752861126126, -5, -34.5000000000003),
        (-4.8939e-13, -5, -68.99999999999997),
        (-59.75575286112658, -5, -34.49999999999944),
        (-59.755752861125856, -5, 34.50000000000067),
    ]]
    chamfer(chamfer_1_edges, length=CHAMFER_1_SIZE)

    # 草图3 → 凸台-拉伸3 (add)
    with SkipClean():  # the faces are left unmerged after this step: merging them gives an invalid solid
        with BuildSketch(Plane(origin=(0, 4, 0), x_dir=(1, 0, 0), z_dir=(0, 1, 0))):
            Circle(SKETCH_3_R)
            Circle(SKETCH_3_R_2, mode=Mode.SUBTRACT)
        extrude(amount=-EXTRUDE_3_DEPTH)

    # 草图4 → 切除-拉伸1 (cut)
    with SkipClean():  # the faces are left unmerged after this step: merging them gives an invalid solid
        with BuildSketch(Plane(origin=(0, 4, 0), x_dir=(1, 0, 0), z_dir=(0, 1, 0))):
            Circle(SKETCH_4_R)
        extrude(amount=-CUT_EXTRUDE_1_DEPTH, mode=Mode.SUBTRACT)

    # 草图5 → 凸台-拉伸4 (add)
    with SkipClean():  # the faces are left unmerged after this step: merging them gives an invalid solid
        with BuildSketch(Plane(origin=(0, 4, 0), x_dir=(1, 0, 0), z_dir=(0, 1, 0))):
            Circle(SKETCH_5_R)
            with Locations(Location((0, 0, 0), (0, 0, 270))):
                Circle(SKETCH_5_R_2, mode=Mode.SUBTRACT)
        extrude(amount=-EXTRUDE_4_DEPTH)

    # 草图6 → 切除-拉伸2 (cut)
    with SkipClean():  # the faces are left unmerged after this step: merging them gives an invalid solid
        with BuildSketch(Plane.XZ):
            with Locations(Location((8.999999999999854, 15.58845726811998, 0), (0, 0, 270))):
                Circle(SKETCH_6_R)
            with Locations(Location((18.000000000000888, 6.7967e-13, 0), (0, 0, 270))):
                Circle(SKETCH_6_R_2)
            with Locations(Location((9.000000000001913, -15.588457268119818, 0), (0, 0, 270))):
                Circle(SKETCH_6_R_3)
            with Locations(Location((-8.999999999998092, -15.588457268121008, 0), (0, 0, 270))):
                Circle(SKETCH_6_R_4)
            with Locations(Location((-17.999999999999126, -1.70974e-12, 0), (0, 0, 270))):
                Circle(SKETCH_6_R_5)
            with Locations(Location((-9.000000000000162, 15.588457268118784, 0), (0, 0, 270))):
                Circle(SKETCH_6_R_6)
        extrude(amount=-CUT_EXTRUDE_2_DEPTH, mode=Mode.SUBTRACT)

    # 草图7 → 切除-拉伸3 (cut)
    with BuildSketch(Plane(origin=(0, 0, 0), x_dir=(-1, 0, 0), z_dir=(0, -1, 0))):
        Circle(SKETCH_7_R)
    extrude(amount=CUT_EXTRUDE_3_DEPTH, mode=Mode.SUBTRACT)

    # 草图8 → 切除-拉伸4 (cut)
    with BuildSketch(Plane(origin=(0, 4, 0), x_dir=(1, 0, 0), z_dir=(0, 1, 0))):
        Circle(SKETCH_8_R)
    extrude(amount=CUT_EXTRUDE_4_DEPTH, mode=Mode.SUBTRACT)

    # 草图9 → 凸台-拉伸5 (add)
    # profile 1 of 6: a face of its own
    with BuildSketch(Plane(origin=(0, 0, 0), x_dir=(-1, 0, 0), z_dir=(0, -1, 0))):
        with Locations((35.24999999999988, 61.05479096680301)):
            Circle(SKETCH_9_R)
        with Locations(Location((35.24999999999988, 61.05479096680301, 0), (0, 0, 270))):
            Circle(SKETCH_9_R_2, mode=Mode.SUBTRACT)
    # profile 2 of 6: a face of its own
    with BuildSketch(Plane(origin=(0, 0, 0), x_dir=(-1, 0, 0), z_dir=(0, -1, 0))):
        with Locations((70.5000000000035, 2.17193e-12)):
            Circle(SKETCH_9_R_3)
        with Locations(Location((70.5000000000035, 2.17193e-12, 0), (0, 0, 270))):
            Circle(SKETCH_9_R_4, mode=Mode.SUBTRACT)
    # profile 3 of 6: a face of its own
    with BuildSketch(Plane(origin=(0, 0, 0), x_dir=(-1, 0, 0), z_dir=(0, -1, 0))):
        with Locations((35.2500000000071, -61.05479096680287)):
            Circle(SKETCH_9_R_5)
        with Locations(Location((35.2500000000071, -61.05479096680287, 0), (0, 0, 270))):
            Circle(SKETCH_9_R_6, mode=Mode.SUBTRACT)
    # profile 4 of 6: a face of its own
    with BuildSketch(Plane(origin=(0, 0, 0), x_dir=(-1, 0, 0), z_dir=(0, -1, 0))):
        with Locations((-35.24999999999293, -61.05479096680704)):
            Circle(SKETCH_9_R_7)
        with Locations(Location((-35.24999999999293, -61.05479096680704, 0), (0, 0, 270))):
            Circle(SKETCH_9_R_8, mode=Mode.SUBTRACT)
    # profile 5 of 6: a face of its own
    with BuildSketch(Plane(origin=(0, 0, 0), x_dir=(-1, 0, 0), z_dir=(0, -1, 0))):
        with Locations((-70.49999999999656, -6.20346e-12)):
            Circle(SKETCH_9_R_9)
        with Locations(Location((-70.49999999999656, -6.20346e-12, 0), (0, 0, 270))):
            Circle(SKETCH_9_R_10, mode=Mode.SUBTRACT)
    # profile 6 of 6: a face of its own
    with BuildSketch(Plane(origin=(0, 0, 0), x_dir=(-1, 0, 0), z_dir=(0, -1, 0))):
        with Locations((-35.25000000000019, 61.05479096679882)):
            Circle(SKETCH_9_R_11)
        with Locations(Location((-35.25000000000019, 61.05479096679882, 0), (0, 0, 270))):
            Circle(SKETCH_9_R_12, mode=Mode.SUBTRACT)
    extrude(amount=-EXTRUDE_5_DEPTH)


solid = part.part
